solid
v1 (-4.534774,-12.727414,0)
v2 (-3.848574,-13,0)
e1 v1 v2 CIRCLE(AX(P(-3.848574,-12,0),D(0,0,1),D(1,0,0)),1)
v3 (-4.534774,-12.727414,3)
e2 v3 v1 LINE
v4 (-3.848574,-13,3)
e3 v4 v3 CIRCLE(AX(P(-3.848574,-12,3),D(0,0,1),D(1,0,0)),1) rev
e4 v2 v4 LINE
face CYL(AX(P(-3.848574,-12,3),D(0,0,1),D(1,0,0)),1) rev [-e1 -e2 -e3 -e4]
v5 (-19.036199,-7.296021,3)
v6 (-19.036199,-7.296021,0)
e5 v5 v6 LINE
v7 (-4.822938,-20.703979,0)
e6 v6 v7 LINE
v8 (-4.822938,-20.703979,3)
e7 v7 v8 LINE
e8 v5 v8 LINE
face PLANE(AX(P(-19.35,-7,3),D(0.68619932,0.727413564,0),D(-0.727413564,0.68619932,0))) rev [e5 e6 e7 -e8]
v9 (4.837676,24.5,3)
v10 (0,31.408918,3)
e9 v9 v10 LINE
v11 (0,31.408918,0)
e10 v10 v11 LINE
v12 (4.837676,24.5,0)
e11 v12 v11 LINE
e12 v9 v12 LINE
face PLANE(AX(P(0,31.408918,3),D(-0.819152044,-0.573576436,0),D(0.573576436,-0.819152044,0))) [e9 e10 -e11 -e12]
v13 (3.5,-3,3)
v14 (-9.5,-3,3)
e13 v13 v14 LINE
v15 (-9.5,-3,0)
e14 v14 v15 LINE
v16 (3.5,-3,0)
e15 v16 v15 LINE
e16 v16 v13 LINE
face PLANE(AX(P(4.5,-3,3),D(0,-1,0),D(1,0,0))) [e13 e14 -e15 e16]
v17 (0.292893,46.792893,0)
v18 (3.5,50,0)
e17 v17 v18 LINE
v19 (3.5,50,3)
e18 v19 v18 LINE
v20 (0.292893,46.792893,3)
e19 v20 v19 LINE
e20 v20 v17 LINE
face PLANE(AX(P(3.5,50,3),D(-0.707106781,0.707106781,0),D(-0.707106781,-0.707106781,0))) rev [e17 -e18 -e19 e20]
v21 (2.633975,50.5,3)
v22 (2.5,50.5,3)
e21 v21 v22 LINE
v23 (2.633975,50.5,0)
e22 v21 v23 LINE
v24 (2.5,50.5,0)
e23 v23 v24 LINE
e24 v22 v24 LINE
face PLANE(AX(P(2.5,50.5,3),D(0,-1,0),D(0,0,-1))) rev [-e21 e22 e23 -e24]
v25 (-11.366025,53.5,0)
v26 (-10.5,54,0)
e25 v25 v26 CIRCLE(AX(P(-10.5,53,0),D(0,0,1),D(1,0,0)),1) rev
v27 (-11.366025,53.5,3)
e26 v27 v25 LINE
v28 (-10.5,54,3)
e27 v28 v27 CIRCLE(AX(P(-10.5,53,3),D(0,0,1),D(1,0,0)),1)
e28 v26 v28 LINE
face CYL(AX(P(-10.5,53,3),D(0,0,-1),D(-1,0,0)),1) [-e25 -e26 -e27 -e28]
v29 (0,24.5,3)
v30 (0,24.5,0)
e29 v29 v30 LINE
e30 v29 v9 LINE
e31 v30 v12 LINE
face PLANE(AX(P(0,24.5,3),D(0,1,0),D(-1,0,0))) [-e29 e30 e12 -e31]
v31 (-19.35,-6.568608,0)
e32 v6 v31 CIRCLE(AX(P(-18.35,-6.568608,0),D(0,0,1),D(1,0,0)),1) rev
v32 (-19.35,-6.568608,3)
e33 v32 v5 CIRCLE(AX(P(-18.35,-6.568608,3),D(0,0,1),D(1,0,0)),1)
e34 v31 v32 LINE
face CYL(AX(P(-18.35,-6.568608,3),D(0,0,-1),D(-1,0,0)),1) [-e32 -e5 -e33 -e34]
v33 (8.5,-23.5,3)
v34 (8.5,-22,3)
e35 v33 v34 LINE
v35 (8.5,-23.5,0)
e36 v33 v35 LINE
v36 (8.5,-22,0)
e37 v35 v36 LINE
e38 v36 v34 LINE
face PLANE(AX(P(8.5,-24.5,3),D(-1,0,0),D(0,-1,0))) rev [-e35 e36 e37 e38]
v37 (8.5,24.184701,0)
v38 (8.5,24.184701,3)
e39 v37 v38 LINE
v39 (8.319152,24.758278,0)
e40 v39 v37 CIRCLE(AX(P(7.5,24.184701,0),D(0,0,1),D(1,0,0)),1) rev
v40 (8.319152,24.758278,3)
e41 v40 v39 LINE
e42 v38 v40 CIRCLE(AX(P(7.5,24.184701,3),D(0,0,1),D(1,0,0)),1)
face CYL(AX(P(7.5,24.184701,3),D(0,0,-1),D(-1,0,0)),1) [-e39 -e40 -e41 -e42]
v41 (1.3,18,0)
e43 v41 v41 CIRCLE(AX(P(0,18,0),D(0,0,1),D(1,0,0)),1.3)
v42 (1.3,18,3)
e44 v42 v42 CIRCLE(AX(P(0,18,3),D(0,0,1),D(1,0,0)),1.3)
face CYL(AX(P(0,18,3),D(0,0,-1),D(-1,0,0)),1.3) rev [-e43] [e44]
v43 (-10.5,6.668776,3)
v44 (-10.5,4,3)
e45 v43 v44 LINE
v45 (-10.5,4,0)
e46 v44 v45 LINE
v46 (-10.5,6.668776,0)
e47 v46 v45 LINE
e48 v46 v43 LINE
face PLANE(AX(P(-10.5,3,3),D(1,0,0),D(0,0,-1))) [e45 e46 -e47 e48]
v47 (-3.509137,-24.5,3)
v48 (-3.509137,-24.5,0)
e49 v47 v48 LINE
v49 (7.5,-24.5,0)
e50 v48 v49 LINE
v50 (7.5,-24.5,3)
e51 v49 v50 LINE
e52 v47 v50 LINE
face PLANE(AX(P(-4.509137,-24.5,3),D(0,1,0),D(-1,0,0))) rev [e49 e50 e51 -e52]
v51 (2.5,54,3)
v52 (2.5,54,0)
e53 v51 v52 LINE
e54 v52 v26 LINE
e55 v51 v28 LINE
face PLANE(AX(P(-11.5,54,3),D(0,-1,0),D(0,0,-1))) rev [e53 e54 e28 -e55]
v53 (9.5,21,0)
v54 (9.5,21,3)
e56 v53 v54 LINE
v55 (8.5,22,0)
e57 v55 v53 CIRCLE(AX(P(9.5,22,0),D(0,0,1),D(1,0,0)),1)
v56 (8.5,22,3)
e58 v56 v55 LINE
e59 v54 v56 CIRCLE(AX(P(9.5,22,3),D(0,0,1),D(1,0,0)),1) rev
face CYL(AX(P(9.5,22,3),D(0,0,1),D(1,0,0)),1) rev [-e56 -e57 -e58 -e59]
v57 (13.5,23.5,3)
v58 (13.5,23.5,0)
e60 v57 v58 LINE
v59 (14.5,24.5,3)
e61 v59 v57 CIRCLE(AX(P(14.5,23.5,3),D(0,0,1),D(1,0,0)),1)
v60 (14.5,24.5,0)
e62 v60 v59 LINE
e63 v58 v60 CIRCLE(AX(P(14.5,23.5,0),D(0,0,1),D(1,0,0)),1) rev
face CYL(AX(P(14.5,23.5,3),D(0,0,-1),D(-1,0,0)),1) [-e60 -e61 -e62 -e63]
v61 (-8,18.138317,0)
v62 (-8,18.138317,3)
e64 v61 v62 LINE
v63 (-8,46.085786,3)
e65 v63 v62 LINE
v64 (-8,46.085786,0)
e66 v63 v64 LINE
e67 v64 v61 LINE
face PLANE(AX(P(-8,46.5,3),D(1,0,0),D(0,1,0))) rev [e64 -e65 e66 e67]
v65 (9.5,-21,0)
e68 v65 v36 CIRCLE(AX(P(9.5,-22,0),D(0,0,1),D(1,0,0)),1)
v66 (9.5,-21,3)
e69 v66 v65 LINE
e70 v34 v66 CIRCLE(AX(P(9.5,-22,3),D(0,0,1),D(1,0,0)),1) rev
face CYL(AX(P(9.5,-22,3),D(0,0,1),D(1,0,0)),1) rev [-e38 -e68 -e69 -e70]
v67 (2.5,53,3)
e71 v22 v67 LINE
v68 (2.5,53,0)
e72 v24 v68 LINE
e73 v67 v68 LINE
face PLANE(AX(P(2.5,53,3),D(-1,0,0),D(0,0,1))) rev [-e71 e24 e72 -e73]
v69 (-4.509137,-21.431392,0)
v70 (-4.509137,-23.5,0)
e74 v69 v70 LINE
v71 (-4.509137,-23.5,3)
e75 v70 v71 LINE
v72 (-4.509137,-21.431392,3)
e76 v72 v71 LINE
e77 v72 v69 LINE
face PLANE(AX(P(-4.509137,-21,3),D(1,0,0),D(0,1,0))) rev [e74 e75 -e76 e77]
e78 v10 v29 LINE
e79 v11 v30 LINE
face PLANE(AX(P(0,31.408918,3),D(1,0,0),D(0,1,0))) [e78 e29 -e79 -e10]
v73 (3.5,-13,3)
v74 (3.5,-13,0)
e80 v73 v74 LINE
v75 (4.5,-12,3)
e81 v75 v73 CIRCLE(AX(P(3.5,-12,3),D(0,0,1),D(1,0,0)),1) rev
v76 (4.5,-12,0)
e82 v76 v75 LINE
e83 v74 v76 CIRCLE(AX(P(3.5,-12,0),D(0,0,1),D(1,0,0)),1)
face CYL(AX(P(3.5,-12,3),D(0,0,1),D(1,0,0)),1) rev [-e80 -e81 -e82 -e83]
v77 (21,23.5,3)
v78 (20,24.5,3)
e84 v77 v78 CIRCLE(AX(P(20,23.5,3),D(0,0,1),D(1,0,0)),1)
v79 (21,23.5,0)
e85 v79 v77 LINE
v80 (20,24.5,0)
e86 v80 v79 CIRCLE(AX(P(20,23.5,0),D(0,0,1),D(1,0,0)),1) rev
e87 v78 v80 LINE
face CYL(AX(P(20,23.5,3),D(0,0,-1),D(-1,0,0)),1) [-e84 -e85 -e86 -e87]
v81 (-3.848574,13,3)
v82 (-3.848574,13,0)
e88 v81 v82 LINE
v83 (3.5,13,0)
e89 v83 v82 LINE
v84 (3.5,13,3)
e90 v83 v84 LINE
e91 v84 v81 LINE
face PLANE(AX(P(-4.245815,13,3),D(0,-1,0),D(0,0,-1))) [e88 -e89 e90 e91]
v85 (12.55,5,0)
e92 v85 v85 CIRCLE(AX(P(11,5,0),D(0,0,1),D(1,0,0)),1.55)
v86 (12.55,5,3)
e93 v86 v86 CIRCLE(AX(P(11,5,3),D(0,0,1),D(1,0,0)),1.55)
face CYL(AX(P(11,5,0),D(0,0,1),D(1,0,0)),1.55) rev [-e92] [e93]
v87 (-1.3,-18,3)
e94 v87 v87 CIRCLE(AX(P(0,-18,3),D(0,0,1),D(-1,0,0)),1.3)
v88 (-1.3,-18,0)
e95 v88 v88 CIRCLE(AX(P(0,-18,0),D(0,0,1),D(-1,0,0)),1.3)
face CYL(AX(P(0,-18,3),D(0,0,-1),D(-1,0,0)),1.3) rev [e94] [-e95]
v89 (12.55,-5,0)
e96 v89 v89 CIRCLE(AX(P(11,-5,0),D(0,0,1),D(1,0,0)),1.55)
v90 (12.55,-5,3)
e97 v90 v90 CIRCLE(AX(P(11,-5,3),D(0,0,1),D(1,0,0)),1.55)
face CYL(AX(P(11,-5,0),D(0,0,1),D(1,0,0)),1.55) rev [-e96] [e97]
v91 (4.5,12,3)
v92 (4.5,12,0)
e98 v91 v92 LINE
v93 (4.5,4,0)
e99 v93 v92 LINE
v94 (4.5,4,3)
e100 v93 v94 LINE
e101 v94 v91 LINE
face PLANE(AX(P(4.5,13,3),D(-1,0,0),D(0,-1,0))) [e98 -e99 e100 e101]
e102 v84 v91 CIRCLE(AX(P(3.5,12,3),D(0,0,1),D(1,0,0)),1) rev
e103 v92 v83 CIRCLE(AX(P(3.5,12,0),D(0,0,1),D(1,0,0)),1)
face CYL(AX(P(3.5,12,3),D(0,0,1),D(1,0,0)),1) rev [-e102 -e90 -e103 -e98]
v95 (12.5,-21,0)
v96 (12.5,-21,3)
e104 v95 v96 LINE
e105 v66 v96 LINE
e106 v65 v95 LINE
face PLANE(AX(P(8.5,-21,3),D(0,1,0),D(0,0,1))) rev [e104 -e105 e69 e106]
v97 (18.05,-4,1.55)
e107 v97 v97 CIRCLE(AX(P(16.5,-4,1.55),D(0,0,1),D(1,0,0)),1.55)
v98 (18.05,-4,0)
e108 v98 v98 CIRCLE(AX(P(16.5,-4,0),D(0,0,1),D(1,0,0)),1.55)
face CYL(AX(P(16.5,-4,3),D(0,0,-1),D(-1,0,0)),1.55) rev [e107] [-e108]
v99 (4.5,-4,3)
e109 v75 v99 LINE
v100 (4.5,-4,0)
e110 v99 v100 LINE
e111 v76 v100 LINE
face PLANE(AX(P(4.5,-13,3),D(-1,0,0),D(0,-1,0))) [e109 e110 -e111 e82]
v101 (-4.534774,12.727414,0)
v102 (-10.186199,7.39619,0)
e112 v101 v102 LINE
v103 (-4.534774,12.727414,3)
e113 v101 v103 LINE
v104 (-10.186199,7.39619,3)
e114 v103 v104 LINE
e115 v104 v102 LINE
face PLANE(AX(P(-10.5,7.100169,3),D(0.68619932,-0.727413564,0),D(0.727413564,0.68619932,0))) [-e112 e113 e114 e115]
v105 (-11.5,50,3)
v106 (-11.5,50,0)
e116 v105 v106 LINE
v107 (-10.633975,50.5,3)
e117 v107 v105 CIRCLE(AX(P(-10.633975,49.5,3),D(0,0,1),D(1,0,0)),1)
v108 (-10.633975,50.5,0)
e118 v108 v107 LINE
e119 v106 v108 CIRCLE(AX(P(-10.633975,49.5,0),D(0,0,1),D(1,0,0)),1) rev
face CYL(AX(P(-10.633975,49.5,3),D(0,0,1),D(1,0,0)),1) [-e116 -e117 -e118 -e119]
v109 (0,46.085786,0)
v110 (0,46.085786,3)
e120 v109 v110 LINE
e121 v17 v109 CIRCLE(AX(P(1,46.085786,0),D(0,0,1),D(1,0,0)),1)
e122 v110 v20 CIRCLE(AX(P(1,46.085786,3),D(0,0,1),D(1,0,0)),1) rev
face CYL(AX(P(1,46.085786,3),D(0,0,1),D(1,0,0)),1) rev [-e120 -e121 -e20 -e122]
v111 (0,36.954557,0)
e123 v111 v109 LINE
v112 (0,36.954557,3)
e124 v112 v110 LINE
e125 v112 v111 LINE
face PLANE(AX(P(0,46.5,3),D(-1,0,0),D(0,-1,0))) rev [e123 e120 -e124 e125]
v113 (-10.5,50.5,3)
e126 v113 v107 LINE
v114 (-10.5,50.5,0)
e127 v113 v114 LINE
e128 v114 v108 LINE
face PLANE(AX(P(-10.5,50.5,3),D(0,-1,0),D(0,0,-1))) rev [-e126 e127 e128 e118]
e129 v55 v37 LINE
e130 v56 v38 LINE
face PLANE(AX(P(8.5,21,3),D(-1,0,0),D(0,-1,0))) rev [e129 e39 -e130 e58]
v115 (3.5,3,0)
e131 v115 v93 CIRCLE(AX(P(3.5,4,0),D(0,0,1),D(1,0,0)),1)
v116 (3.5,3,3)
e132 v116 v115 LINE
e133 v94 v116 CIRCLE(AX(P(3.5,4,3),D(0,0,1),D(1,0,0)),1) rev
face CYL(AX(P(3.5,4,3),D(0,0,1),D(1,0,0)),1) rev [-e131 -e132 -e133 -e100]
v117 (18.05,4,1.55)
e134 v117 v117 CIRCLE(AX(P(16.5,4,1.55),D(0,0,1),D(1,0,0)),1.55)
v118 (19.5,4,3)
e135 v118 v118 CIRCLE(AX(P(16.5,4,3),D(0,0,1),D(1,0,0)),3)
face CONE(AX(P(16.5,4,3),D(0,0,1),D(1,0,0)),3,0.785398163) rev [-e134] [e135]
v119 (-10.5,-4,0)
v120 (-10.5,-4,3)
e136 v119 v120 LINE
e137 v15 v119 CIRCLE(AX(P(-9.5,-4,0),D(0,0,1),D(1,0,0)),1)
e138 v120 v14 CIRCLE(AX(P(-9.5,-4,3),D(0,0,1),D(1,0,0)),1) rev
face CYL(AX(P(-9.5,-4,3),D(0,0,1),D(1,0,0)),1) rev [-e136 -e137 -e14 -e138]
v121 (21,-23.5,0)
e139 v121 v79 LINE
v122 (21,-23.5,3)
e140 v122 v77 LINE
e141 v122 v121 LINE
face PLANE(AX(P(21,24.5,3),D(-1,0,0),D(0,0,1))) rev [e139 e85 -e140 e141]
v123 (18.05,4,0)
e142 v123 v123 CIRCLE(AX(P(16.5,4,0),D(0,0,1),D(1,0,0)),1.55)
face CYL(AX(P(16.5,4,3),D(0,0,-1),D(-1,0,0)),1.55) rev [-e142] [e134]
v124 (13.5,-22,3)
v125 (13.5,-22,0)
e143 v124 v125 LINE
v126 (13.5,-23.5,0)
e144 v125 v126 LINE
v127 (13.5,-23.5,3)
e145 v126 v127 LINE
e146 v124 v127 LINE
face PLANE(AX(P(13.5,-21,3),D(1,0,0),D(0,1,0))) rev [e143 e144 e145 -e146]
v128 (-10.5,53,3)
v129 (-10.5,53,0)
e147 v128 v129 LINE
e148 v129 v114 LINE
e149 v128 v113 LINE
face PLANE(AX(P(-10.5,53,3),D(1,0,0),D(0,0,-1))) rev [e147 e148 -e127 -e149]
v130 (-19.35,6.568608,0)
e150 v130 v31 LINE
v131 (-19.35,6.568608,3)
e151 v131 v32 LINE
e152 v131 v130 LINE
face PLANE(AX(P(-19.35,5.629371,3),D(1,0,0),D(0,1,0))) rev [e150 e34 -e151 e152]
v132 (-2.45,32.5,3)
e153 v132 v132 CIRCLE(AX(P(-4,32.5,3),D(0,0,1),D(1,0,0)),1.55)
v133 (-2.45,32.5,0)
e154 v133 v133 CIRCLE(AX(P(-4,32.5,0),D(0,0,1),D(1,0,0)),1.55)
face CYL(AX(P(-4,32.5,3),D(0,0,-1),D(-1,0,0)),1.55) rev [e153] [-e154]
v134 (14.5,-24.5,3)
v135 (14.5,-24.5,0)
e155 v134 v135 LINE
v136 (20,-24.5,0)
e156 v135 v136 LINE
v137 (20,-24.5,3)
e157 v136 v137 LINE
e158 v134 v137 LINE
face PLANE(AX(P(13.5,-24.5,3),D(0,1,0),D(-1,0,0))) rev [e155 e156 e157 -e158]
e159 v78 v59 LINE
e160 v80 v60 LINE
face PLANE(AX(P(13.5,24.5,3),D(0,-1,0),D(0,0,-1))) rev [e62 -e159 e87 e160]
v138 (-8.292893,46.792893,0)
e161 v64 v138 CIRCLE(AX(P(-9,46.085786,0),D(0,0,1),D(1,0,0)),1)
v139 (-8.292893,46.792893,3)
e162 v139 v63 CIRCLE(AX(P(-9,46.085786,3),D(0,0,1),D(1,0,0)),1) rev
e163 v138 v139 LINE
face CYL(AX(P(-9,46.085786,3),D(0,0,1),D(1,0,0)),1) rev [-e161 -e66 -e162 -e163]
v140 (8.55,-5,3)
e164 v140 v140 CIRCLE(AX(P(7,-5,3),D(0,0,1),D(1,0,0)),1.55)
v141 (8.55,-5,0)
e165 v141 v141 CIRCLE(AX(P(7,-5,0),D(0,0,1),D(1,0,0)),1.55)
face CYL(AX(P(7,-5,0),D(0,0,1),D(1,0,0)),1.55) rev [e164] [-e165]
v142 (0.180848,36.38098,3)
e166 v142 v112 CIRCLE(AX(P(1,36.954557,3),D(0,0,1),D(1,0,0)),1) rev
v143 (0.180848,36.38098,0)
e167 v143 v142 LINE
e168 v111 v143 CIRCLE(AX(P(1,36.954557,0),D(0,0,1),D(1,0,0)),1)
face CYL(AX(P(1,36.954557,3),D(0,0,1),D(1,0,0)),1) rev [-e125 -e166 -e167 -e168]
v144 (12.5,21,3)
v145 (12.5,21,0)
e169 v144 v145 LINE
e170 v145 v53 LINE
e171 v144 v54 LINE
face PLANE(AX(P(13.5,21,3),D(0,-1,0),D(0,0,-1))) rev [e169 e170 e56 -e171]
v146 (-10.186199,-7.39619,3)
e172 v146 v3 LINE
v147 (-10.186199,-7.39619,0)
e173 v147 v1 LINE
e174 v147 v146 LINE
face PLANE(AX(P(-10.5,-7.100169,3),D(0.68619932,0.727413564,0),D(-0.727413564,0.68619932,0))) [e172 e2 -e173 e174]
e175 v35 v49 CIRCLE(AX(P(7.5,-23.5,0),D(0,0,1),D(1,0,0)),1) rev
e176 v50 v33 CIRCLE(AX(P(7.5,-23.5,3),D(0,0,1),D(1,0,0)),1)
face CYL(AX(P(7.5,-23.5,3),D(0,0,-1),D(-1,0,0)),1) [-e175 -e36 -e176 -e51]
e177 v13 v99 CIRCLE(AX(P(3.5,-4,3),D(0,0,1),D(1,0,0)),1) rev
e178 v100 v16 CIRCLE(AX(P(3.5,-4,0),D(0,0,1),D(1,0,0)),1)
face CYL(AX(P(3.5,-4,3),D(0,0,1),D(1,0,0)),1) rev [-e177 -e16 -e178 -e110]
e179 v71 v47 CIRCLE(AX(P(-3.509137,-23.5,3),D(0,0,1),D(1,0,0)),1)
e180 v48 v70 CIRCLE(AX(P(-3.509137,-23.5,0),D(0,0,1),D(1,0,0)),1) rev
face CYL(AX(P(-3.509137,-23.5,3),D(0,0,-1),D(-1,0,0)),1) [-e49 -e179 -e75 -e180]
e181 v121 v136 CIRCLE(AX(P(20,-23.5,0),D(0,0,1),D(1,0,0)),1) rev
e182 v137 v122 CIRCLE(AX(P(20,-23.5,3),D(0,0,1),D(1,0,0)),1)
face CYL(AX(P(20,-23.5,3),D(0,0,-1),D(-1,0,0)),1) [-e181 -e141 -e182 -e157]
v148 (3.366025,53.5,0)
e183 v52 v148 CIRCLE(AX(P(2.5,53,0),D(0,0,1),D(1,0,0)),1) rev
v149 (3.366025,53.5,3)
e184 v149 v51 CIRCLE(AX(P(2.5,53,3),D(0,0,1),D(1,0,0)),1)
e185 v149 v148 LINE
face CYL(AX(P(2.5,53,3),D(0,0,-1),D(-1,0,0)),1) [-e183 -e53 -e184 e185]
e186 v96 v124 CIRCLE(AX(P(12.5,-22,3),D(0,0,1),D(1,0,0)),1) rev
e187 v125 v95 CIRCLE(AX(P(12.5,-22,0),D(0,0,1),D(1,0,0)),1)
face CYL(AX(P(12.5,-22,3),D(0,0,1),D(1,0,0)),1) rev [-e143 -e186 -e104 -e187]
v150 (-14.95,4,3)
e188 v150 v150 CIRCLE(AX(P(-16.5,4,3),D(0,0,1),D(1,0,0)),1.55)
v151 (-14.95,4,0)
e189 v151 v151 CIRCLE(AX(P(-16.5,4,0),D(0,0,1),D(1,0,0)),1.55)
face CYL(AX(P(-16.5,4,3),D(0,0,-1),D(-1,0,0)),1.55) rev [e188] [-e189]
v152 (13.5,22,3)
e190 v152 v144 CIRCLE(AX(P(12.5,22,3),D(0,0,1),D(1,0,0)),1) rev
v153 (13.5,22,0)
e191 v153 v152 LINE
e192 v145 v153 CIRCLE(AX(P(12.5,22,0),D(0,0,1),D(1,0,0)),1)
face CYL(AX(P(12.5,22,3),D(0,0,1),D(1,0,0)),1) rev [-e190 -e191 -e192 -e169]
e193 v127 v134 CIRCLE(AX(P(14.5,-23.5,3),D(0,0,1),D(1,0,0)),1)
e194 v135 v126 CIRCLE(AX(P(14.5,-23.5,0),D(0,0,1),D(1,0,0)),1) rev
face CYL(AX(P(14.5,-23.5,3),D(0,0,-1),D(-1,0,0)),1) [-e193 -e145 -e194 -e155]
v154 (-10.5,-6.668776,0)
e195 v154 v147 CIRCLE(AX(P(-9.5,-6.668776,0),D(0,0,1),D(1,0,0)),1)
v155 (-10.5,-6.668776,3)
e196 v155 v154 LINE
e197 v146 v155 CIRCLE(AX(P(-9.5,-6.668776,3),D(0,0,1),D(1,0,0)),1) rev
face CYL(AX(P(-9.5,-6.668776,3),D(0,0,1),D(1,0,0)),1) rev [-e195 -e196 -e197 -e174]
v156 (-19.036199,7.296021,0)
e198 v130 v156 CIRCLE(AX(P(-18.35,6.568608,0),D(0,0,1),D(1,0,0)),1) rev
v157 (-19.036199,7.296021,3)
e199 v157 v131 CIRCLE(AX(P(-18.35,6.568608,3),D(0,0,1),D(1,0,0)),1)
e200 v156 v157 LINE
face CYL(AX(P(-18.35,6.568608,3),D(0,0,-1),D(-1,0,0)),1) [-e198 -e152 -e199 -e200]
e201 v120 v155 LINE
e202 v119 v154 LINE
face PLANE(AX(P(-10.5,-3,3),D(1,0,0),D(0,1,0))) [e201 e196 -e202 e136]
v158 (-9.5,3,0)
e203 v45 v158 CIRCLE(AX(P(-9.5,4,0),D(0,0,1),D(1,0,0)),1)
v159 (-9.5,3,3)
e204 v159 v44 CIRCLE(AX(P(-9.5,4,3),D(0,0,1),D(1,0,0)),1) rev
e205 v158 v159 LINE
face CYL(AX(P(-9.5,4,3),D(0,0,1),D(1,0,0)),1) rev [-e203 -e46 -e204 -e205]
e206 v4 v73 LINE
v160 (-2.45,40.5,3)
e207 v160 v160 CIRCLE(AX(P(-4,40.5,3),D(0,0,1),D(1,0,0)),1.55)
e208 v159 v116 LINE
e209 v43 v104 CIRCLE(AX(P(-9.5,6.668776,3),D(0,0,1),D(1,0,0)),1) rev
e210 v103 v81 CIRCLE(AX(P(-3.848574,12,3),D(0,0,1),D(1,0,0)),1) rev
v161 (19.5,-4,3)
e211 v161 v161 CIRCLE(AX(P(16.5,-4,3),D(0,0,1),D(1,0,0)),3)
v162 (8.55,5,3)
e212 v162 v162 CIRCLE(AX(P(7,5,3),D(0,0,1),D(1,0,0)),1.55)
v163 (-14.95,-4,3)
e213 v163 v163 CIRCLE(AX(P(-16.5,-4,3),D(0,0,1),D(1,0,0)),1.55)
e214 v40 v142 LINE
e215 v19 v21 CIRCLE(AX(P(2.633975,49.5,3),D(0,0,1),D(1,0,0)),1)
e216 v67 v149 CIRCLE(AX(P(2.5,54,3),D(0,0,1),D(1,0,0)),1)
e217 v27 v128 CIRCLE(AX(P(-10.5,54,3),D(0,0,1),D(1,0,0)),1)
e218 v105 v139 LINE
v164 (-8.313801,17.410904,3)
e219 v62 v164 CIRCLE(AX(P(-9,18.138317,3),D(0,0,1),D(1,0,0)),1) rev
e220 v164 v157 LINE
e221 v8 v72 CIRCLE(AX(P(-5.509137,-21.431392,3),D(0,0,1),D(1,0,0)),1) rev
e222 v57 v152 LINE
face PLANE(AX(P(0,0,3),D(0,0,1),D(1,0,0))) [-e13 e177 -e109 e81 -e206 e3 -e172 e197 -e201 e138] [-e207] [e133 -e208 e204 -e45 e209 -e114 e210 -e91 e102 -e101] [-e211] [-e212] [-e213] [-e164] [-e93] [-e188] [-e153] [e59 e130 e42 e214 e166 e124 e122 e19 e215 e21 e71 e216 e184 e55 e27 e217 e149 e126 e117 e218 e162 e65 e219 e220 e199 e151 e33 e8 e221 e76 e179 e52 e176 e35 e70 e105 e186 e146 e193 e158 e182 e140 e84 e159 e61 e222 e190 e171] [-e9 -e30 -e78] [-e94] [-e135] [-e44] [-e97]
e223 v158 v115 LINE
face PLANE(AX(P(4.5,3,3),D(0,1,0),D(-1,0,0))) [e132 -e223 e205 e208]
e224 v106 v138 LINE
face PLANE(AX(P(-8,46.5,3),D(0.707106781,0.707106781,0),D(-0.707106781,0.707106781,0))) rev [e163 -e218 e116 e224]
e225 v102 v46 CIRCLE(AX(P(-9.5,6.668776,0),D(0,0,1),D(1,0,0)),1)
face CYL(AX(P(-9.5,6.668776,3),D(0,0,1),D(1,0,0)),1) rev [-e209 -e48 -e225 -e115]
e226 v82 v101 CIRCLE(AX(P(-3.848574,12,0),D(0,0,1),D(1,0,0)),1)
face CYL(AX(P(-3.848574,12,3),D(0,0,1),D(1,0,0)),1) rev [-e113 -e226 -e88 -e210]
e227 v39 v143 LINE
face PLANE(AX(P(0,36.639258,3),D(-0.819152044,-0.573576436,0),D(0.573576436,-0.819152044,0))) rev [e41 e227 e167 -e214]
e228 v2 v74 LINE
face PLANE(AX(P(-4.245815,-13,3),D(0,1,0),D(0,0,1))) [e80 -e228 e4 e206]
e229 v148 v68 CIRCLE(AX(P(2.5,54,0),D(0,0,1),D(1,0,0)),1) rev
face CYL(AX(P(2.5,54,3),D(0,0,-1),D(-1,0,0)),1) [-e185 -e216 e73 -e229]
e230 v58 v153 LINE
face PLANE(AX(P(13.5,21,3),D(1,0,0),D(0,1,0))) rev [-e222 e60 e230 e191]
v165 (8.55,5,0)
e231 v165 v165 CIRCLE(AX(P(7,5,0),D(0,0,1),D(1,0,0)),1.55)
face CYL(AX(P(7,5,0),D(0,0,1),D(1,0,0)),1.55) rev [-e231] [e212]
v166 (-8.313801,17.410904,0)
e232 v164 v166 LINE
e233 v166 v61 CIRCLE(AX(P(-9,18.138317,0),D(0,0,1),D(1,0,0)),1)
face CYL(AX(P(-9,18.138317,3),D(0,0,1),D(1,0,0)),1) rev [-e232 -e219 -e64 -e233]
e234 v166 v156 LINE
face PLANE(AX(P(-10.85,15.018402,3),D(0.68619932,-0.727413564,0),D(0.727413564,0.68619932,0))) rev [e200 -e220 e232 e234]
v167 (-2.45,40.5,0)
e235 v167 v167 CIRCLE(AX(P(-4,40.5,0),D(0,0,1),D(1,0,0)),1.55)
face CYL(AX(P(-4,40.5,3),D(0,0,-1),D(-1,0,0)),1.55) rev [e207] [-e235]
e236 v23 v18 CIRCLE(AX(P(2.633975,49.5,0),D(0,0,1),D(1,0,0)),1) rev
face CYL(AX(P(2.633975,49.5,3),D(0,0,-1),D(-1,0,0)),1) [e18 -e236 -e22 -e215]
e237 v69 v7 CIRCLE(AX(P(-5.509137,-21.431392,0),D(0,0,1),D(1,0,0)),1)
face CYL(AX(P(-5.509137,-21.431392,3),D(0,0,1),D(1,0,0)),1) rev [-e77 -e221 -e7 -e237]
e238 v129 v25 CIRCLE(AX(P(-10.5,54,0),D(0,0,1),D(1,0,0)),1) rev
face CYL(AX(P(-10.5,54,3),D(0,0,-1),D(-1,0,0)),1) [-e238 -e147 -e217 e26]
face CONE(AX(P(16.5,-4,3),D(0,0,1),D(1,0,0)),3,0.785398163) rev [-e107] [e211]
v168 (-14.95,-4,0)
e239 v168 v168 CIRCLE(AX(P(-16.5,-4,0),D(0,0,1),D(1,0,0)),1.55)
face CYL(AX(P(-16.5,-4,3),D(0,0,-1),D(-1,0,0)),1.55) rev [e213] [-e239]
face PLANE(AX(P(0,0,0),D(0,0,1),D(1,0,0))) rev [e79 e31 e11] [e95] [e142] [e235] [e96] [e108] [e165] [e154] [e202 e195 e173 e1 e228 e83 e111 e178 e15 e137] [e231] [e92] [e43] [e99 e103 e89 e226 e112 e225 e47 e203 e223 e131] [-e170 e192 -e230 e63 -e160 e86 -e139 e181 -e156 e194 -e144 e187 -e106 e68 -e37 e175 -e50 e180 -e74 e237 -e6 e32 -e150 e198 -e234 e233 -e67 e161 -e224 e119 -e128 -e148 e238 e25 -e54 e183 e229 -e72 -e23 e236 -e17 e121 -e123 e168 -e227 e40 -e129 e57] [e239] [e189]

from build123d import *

# Parameters (mm, degrees)
SKETCH_1_R                   = 1.55
SKETCH_1_R_2                 = 1.3
EXTRUDE_1_DEPTH              = 3
SKETCH_3_R                   = 1.55
CUT_EXTRUDE_1_DEPTH          = 59.017238817
HOLE_WIZARD_M3_1_D           = 3.1
HOLE_WIZARD_M3_1_CSINK_D     = 6
HOLE_WIZARD_M3_1_CSINK_ANGLE = 90
FILLET_1_R                   = 1


with BuildPart() as part:
    # 草图1 → 凸台-拉伸1 (new body)
    with BuildSketch(Plane.XY):
        Polygon((-19.35, -7), (-4.509137286, -21), (-4.509137286, -24.5), (8.5, -24.5), (8.5, -21), (13.5, -21), (13.5, -24.5), (21, -24.5), (21, -12.5), (21, -5.443486713), (21, 5.443486713), (21, 12.5), (21, 24.5), (13.5, 24.5), (13.5, 21), (8.5, 21), (8.5, 24.5), (0, 36.639258057), (0, 46.5), (3.5, 50), (3.5, 50.5), (2.5, 50.5), (2.5, 53), (3.5, 53), (3.5, 54), (-11.5, 54), (-11.5, 53), (-10.5, 53), (-10.5, 50.5), (-11.5, 50.5), (-11.5, 50), (-8, 46.5), (-8, 17.70692473), (-10.85, 15.01840178), (-19.35, 7), (-19.35, 5.629370629), align=None)
        with Locations((-16.5, 4)):
            Circle(SKETCH_1_R, mode=Mode.SUBTRACT)
        with Locations((-16.5, -4)):
            Circle(SKETCH_1_R, mode=Mode.SUBTRACT)
        with Locations((16.5, 4)):
            Circle(SKETCH_1_R, mode=Mode.SUBTRACT)
        with Locations((16.5, -4)):
            Circle(SKETCH_1_R, mode=Mode.SUBTRACT)
        with Locations((0, 18)):
            Circle(SKETCH_1_R_2, mode=Mode.SUBTRACT)
        with Locations(Location((0, -18, 0), (0, 0, 180))):
            Circle(SKETCH_1_R_2, mode=Mode.SUBTRACT)
        with Locations((-4, 40.5)):
            Circle(SKETCH_1_R, mode=Mode.SUBTRACT)
        with Locations((-4, 32.5)):
            Circle(SKETCH_1_R, mode=Mode.SUBTRACT)
        Polygon((0, 24.5), (4.837676234, 24.5), (0, 31.40891767), align=None, mode=Mode.SUBTRACT)
        Polygon((-4.245815128, 13), (4.5, 13), (4.5, 3), (-10.5, 3), (-10.5, 7.100168575), align=None, mode=Mode.SUBTRACT)
        Polygon((-10.5, -3), (-10.5, -7.100168575), (-4.245815128, -13), (4.5, -13), (4.5, -3), align=None, mode=Mode.SUBTRACT)
    extrude(amount=EXTRUDE_1_DEPTH)

    # 草图3 → 切除-拉伸1 (cut, through all)
    with BuildSketch(Plane.XY.offset(3)):
        with Locations((11, 5)):
            Circle(SKETCH_3_R)
        with Locations((7, 5)):
            Circle(SKETCH_3_R)
        with Locations((11, -5)):
            Circle(SKETCH_3_R)
        with Locations((7, -5)):
            Circle(SKETCH_3_R)
    extrude(amount=-CUT_EXTRUDE_1_DEPTH, mode=Mode.SUBTRACT)

    # M3 六角凹锥坑螺钉的锥形沉头孔1 (through all)
    with Locations(Plane(origin=(16.5, -4, 3), x_dir=(1, 0, 0), z_dir=(0, 0, 1))):
        with Locations((0, 0), (0, 8)):
            CounterSinkHole(HOLE_WIZARD_M3_1_D / 2, HOLE_WIZARD_M3_1_CSINK_D / 2, counter_sink_angle=HOLE_WIZARD_M3_1_CSINK_ANGLE)

    # 圆角1
    # the kernel refuses this fillet: 1 mm, written as the material it adds along each edge
    with BuildSketch(Plane(origin=(8.5, 21, 0), x_dir=(0, 1, 0), z_dir=(0, 0, 1)), Plane(origin=(13.5, 21, 0), x_dir=(-1, 0, 0), z_dir=(0, 0, 1)), Plane(origin=(13.5, -21, 0), x_dir=(0, -1, 0), z_dir=(0, 0, 1)), Plane(origin=(8.5, -21, 0), x_dir=(1, 0, 0), z_dir=(0, 0, 1)), Plane(origin=(4.5, -13, 0), x_dir=(-1, 0, 0), z_dir=(0, 0, 1)), Plane(origin=(4.5, -3, 0), x_dir=(0, -1, 0), z_dir=(0, 0, 1)), Plane(origin=(-10.5, 3, 0), x_dir=(0, 1, 0), z_dir=(0, 0, 1)), Plane(origin=(4.5, 3, 0), x_dir=(-1, 0, 0), z_dir=(0, 0, 1)), Plane(origin=(4.5, 13, 0), x_dir=(0, -1, 0), z_dir=(0, 0, 1))) as fillet_1_piece_1:
        with BuildLine():
            CenterArc((FILLET_1_R, -FILLET_1_R), FILLET_1_R, 90, 90)
            Line((0, -FILLET_1_R), (0, 0))
            Line((0, 0), (FILLET_1_R, 0))
        make_face()
    extrude(amount=3)
    with BuildSketch(Plane(origin=(-4.509137286, -21, 0), x_dir=(-0.7274135642622264, 0.686199319824294, 0), z_dir=(0, 0, 1))) as fillet_1_piece_2:
        with BuildLine():
            CenterArc((FILLET_1_R * 0.431392395733, FILLET_1_R), FILLET_1_R, 223.33, 46.67)
            Line((-FILLET_1_R * 0.296021168529, FILLET_1_R * 0.313800680176), (0, 0))
            Line((0, 0), (FILLET_1_R * 0.431392395733, 0))
        make_face()
    extrude(amount=3)
    with BuildSketch(Plane(origin=(-10.5, -7.100168575, 0), x_dir=(0, 1, 0), z_dir=(0, 0, 1)), Plane(origin=(-10.5, 7.100168575, 0), x_dir=(0.7274135642622253, 0.6861993198242954, 0), z_dir=(0, 0, 1)), Plane(origin=(-8, 17.70692473, 0), x_dir=(-0.7274135642622253, -0.6861993198242954, 0), z_dir=(0, 0, 1))) as fillet_1_piece_3:
        with BuildLine():
            CenterArc((FILLET_1_R * 0.431392395733, -FILLET_1_R), FILLET_1_R, 90, 46.67)
            Line((-FILLET_1_R * 0.296021168529, -FILLET_1_R * 0.313800680176), (0, 0))
            Line((0, 0), (FILLET_1_R * 0.431392395733, 0))
        make_face()
    extrude(amount=3)
    with BuildSketch(Plane(origin=(-4.245815128, -13, 0), x_dir=(-0.727413564262223, 0.6861993198242976, 0), z_dir=(0, 0, 1))) as fillet_1_piece_4:
        with BuildLine():
            CenterArc((FILLET_1_R * 0.397240900512, -FILLET_1_R), FILLET_1_R, 90, 43.33)
            Line((-FILLET_1_R * 0.288958419312, -FILLET_1_R * 0.272586435738), (0, 0))
            Line((0, 0), (FILLET_1_R * 0.397240900512, 0))
        make_face()
    extrude(amount=3)
    with BuildSketch(Plane(origin=(-10.5, -3, 0), x_dir=(0, -1, 0), z_dir=(0, 0, 1))) as fillet_1_piece_5:
        with BuildLine():
            CenterArc((FILLET_1_R, FILLET_1_R), FILLET_1_R, 180, 90)
            Line((0, FILLET_1_R), (0, 0))
            Line((0, 0), (FILLET_1_R, 0))
        make_face()
    extrude(amount=3)
    with BuildSketch(Plane(origin=(-4.245815128, 13, 0), x_dir=(-0.727413564262223, -0.6861993198242976, 0), z_dir=(0, 0, 1))) as fillet_1_piece_6:
        with BuildLine():
            CenterArc((FILLET_1_R * 0.397240900512, FILLET_1_R), FILLET_1_R, 226.67, 43.33)
            Line((-FILLET_1_R * 0.288958419312, FILLET_1_R * 0.272586435738), (0, 0))
            Line((0, 0), (FILLET_1_R * 0.397240900512, 0))
        make_face()
    extrude(amount=3)
    with BuildSketch(Plane(origin=(-8, 46.5, 0), x_dir=(0, -1, 0), z_dir=(0, 0, 1)), Plane(origin=(0, 46.5, 0), x_dir=(0.7071067811865551, 0.70710678118654, 0), z_dir=(0, 0, 1))) as fillet_1_piece_7:
        with BuildLine():
            CenterArc((FILLET_1_R * 0.414213562373, -FILLET_1_R), FILLET_1_R, 90, 45)
            Line((-FILLET_1_R * 0.292893218813, -FILLET_1_R * 0.292893218813), (0, 0))
            Line((0, 0), (FILLET_1_R * 0.414213562373, 0))
        make_face()
    extrude(amount=3)
    with BuildSketch(Plane(origin=(0, 36.639258057, 0), x_dir=(0, 1, 0), z_dir=(0, 0, 1))) as fillet_1_piece_8:
        with BuildLine():
            CenterArc((FILLET_1_R * 0.315298788879, -FILLET_1_R), FILLET_1_R, 90, 35)
            Line((-FILLET_1_R * 0.258277647472, -FILLET_1_R * 0.180847955711), (0, 0))
            Line((0, 0), (FILLET_1_R * 0.315298788879, 0))
        make_face()
    extrude(amount=3)
    # the kernel refuses this fillet: 1 mm, written as the material it takes off along each edge
    with BuildSketch(Plane(origin=(13.5, 24.5, -2.5), x_dir=(1, 0, 0), z_dir=(0, 0, 1)), Plane(origin=(21, 24.5, -2.5), x_dir=(0, -1, 0), z_dir=(0, 0, 1)), Plane(origin=(21, -24.5, -2.5), x_dir=(-1, 0, 0), z_dir=(0, 0, 1)), Plane(origin=(13.5, -24.5, -2.5), x_dir=(0, 1, 0), z_dir=(0, 0, 1)), Plane(origin=(8.5, -24.5, -2.5), x_dir=(-1, 0, 0), z_dir=(0, 0, 1)), Plane(origin=(-4.509137286, -24.5, -2.5), x_dir=(0, 1, 0), z_dir=(0, 0, 1)), Plane(origin=(-11.5, 53, -2.5), x_dir=(0, 1, 0), z_dir=(0, 0, 1)), Plane(origin=(-11.5, 54, -2.5), x_dir=(1, 0, 0), z_dir=(0, 0, 1)), Plane(origin=(3.5, 54, -2.5), x_dir=(0, -1, 0), z_dir=(0, 0, 1)), Plane(origin=(3.5, 53, -2.5), x_dir=(-1, 0, 0), z_dir=(0, 0, 1))) as fillet_1_2_piece_1:
        with BuildLine():
            CenterArc((FILLET_1_R, -FILLET_1_R), FILLET_1_R, 90, 90)
            Line((0, -FILLET_1_R), (0, 0))
            Line((0, 0), (FILLET_1_R, 0))
        make_face()
    extrude(amount=8, mode=Mode.SUBTRACT)
    with BuildSketch(Plane(origin=(-19.35, -7, -1.078480989), x_dir=(0.7274135642622251, -0.6861993198242955, 0), z_dir=(0, 0, 1)), Plane(origin=(-19.35, 7, -1.078480989), x_dir=(0, -1, 0), z_dir=(0, 0, 1))) as fillet_1_2_piece_2:
        with BuildLine():
            CenterArc((FILLET_1_R * 0.431392395733, FILLET_1_R), FILLET_1_R, 223.33, 46.67)
            Line((-FILLET_1_R * 0.296021168529, FILLET_1_R * 0.313800680176), (0, 0))
            Line((0, 0), (FILLET_1_R * 0.431392395733, 0))
        make_face()
    extrude(amount=5.156961979, mode=Mode.SUBTRACT)
    with BuildSketch(Plane(origin=(-11.5, 50.5, -2.165063509), x_dir=(1, 0, 0), z_dir=(0, 0, 1))) as fillet_1_2_piece_3:
        with BuildLine():
            CenterArc((0.866025404, -1), FILLET_1_R, 90, 60)
            Line((0, -0.5), (0, 0))
            Line((0, 0), (0.866025404, 0))
        make_face()
    extrude(amount=7.330127019, mode=Mode.SUBTRACT)
    with BuildSketch(Plane(origin=(3.5, 50.5, -2.165063509), x_dir=(0, -1, 0), z_dir=(0, 0, 1))) as fillet_1_2_piece_4:
        with BuildLine():
            CenterArc((1, -0.866025404), FILLET_1_R, 120, 60)
            Line((0, -0.866025404), (0, 0))
            Line((0, 0), (0.5, 0))
        make_face()
    extrude(amount=7.330127019, mode=Mode.SUBTRACT)
    with BuildSketch(Plane(origin=(8.5, 24.5, -0.788246972), x_dir=(0, -1, 0), z_dir=(0, 0, 1))) as fillet_1_2_piece_5:
        with BuildLine():
            CenterArc((FILLET_1_R * 0.315298788879, -FILLET_1_R), FILLET_1_R, 90, 35)
            Line((-FILLET_1_R * 0.258277647472, -FILLET_1_R * 0.180847955711), (0, 0))
            Line((0, 0), (FILLET_1_R * 0.315298788879, 0))
        make_face()
    extrude(amount=4.576493944, mode=Mode.SUBTRACT)


solid = part.part
